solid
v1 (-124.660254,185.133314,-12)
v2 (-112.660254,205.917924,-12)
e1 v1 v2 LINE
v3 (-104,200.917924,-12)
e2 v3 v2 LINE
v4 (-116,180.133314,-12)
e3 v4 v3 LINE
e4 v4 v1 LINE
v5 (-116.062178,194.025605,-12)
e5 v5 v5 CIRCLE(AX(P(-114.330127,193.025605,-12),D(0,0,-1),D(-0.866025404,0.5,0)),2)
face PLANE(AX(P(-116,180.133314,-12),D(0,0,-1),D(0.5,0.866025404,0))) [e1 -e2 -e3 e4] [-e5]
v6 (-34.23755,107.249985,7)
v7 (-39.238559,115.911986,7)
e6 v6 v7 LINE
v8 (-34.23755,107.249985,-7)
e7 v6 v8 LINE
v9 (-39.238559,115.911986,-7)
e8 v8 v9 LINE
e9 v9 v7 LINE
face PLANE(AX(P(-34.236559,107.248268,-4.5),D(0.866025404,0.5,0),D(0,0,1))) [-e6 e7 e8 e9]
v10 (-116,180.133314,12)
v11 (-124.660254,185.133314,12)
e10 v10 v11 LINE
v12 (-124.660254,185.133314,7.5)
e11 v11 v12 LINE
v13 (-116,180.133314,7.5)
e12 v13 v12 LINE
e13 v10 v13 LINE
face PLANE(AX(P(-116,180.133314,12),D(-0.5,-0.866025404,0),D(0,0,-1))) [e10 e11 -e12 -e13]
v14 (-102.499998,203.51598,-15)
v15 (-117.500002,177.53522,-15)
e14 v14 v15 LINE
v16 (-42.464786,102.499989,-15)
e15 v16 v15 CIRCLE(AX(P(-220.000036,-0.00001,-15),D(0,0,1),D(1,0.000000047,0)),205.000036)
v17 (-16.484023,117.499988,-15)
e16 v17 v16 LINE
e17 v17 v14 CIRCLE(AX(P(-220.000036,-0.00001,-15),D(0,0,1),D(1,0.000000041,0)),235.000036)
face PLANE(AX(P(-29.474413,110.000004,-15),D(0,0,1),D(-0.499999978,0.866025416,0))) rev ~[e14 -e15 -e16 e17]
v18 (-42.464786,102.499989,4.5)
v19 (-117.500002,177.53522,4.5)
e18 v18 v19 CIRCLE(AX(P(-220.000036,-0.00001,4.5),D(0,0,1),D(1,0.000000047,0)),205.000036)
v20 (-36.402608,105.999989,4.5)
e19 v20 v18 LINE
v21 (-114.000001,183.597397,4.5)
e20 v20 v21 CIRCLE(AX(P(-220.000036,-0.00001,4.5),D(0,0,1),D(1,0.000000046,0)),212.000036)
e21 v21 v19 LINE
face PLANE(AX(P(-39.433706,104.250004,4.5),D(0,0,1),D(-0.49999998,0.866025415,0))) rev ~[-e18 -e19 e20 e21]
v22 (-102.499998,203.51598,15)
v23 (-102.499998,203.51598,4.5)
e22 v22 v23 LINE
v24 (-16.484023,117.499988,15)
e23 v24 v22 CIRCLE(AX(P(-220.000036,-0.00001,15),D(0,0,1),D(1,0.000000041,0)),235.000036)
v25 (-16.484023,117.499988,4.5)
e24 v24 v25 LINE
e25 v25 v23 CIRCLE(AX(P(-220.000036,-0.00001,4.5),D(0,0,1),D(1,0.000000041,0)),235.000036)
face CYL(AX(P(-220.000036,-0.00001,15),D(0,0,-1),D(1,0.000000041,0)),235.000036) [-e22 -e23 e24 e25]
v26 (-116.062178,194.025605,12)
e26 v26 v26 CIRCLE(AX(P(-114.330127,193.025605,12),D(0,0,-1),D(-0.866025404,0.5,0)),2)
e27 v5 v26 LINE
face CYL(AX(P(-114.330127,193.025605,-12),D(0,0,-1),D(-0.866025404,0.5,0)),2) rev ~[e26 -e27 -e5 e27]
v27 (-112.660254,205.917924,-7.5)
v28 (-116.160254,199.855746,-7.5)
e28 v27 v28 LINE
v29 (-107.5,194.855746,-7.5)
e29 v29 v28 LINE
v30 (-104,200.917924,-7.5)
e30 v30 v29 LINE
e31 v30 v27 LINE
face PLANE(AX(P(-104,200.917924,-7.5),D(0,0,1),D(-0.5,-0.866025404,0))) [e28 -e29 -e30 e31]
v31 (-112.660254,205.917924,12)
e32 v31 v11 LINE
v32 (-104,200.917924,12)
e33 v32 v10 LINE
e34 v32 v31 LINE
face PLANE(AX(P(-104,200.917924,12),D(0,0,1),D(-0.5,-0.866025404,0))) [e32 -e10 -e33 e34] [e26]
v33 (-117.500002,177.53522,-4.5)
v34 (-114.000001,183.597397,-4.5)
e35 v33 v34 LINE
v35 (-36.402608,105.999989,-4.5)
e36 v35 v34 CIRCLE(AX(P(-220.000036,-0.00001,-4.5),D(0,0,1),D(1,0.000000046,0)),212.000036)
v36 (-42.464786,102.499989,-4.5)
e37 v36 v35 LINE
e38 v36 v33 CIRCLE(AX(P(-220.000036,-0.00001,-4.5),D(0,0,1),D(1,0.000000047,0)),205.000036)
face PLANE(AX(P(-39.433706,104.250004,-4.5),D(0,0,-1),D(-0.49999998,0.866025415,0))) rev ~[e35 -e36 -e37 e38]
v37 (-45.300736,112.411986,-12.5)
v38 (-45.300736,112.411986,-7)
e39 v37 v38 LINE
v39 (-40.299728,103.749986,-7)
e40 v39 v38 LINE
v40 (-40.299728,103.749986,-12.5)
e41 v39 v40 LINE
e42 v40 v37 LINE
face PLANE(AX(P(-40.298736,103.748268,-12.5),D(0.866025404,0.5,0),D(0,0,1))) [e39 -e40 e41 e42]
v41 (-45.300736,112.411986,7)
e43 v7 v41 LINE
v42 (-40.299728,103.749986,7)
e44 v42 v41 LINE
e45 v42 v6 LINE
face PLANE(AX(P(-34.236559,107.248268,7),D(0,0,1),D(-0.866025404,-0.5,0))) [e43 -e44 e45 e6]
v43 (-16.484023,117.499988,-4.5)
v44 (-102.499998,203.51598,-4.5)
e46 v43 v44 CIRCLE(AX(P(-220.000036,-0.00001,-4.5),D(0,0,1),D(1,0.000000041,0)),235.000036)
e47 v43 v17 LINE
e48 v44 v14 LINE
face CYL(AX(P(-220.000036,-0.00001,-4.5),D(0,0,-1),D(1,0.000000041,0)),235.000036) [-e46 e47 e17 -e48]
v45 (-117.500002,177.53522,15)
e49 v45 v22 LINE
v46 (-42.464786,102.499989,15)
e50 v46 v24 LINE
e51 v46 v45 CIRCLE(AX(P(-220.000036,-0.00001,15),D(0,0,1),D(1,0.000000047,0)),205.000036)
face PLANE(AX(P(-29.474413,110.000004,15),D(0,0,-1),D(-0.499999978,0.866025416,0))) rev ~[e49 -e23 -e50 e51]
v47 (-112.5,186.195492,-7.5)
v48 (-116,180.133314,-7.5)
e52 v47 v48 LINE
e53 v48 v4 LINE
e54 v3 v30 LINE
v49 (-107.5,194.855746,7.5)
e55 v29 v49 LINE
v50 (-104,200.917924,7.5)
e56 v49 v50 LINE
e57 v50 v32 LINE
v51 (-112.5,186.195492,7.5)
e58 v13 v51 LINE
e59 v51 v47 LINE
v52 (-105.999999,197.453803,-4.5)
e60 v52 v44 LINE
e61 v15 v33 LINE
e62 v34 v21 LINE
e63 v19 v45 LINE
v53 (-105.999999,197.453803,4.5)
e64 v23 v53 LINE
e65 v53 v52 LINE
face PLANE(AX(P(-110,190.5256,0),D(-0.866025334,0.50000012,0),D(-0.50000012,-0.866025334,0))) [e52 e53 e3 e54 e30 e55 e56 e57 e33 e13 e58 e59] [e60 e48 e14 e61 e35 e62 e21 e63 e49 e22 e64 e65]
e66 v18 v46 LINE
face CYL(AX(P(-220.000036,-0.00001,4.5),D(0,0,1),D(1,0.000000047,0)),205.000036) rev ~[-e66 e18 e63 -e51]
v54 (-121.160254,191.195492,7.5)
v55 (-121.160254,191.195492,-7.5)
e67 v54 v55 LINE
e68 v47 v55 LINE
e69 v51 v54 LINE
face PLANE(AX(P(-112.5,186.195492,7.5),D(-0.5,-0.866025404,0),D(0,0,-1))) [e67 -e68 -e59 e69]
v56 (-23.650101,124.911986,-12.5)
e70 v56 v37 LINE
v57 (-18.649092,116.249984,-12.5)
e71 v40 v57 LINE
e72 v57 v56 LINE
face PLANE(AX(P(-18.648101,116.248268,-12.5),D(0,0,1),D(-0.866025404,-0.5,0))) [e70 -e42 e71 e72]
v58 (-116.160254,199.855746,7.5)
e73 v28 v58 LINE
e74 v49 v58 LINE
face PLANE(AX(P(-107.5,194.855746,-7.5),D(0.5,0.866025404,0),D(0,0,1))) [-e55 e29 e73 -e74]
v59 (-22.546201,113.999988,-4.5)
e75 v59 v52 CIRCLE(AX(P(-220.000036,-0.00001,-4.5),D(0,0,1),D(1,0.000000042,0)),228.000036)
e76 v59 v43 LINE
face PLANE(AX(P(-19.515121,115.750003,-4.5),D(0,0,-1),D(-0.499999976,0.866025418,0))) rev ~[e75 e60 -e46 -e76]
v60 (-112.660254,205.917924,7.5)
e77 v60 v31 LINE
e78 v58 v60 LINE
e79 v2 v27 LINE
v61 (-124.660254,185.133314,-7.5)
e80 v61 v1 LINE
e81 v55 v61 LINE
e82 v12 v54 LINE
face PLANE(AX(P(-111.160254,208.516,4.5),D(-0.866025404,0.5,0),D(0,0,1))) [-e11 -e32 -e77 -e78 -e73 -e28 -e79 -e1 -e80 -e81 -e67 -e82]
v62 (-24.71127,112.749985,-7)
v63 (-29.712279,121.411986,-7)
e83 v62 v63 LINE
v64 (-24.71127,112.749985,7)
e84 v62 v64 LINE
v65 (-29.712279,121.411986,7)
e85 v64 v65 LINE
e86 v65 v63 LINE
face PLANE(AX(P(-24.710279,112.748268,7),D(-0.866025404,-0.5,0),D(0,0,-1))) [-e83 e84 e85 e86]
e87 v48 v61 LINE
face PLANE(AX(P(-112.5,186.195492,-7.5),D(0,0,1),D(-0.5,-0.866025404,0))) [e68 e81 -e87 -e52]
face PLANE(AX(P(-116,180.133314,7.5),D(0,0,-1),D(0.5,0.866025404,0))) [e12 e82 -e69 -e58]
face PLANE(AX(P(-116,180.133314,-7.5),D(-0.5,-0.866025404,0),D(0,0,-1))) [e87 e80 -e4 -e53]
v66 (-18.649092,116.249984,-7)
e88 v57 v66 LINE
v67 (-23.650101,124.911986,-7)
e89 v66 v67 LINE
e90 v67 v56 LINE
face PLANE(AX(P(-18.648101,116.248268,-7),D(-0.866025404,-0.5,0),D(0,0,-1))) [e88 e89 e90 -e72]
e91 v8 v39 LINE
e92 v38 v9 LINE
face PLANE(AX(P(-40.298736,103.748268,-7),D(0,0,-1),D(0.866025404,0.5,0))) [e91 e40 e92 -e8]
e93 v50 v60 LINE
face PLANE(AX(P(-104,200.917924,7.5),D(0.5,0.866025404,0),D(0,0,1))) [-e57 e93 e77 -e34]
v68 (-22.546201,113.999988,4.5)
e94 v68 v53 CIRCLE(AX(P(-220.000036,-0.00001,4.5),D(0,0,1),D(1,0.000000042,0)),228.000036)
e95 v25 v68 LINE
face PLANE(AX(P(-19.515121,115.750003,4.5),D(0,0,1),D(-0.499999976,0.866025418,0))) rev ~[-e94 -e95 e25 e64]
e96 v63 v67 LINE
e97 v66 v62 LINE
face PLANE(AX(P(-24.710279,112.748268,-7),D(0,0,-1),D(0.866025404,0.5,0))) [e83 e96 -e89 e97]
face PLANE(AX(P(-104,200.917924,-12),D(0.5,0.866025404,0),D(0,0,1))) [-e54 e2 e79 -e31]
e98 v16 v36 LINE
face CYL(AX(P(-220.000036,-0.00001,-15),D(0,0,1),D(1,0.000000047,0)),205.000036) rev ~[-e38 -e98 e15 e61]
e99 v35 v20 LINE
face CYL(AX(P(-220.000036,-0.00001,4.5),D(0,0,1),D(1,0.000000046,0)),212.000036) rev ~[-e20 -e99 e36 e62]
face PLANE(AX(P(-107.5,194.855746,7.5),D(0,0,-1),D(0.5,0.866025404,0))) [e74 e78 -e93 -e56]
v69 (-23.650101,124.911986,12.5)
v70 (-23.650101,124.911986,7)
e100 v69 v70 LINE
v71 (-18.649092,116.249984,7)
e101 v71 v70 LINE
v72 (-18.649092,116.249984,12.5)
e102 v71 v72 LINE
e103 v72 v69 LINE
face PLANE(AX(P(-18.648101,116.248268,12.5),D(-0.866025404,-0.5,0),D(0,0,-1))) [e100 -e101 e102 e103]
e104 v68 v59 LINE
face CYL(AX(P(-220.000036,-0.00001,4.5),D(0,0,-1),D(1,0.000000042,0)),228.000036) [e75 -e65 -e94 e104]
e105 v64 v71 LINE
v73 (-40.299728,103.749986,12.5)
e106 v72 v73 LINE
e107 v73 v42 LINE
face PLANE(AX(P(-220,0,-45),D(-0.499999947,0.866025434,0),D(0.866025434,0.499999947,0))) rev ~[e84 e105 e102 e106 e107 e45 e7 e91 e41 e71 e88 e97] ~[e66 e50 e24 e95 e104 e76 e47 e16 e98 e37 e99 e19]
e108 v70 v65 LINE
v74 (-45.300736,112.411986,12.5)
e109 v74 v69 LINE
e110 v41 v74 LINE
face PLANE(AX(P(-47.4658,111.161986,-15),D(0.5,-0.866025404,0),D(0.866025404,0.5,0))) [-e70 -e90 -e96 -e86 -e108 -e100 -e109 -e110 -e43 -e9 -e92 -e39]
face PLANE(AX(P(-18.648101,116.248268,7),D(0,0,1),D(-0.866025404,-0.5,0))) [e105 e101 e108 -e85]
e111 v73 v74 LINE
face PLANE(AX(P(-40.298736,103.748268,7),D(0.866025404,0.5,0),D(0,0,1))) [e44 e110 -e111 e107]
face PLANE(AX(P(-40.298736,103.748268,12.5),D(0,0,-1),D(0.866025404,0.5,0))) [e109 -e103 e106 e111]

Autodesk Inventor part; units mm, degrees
sketch "Sketch2" plane through (0, 0, 0) normal (0, 1, 0) x (-1, 0, 0)
  line L0 (15, 15) -> (-15, 15)
  line L1 (-15, -15) -> (15, -15)
  line L2 (15, 4.5) -> (8, 4.5)
  line L3 (8, 4.5) -> (8, -4.5)
  line L4 (8, -4.5) -> (15, -4.5)
  line L5 (-15, 4.5) -> (-8, 4.5)
  line L6 (-8, 4.5) -> (-8, -4.5)
  line L7 (-8, -4.5) -> (-15, -4.5)
  line L8 (15, -15) -> (15, -4.5)
  line L9 (15, 4.5) -> (15, 15)
  line L10 (-15, 15) -> (-15, 4.5)
  line L11 (-15, -4.5) -> (-15, -15)
  point P0 (0, 0)
  dimension "d18" = 9
  dimension "d19" = 7
  dimension "d21" = 16
  dimension "d22" = 30
  dimension "d23" = 15
  dimension "d24" = 4.5
  dimension "d25" = 8
sketch "Sketch6" plane through (0, 0, 0) normal (0, 0, 1) x (1, 0, 0)
  arc A0 (0, 0) -> (-110, 190.5256) centre (-220, 0) ccw
  line L0 (-220, 0) -> (-110, 190.5256) construction
  line L1 (-220, 0) -> (0, 0) construction
  dimension "d41" = 220
  dimension "d42" = 60
  dimension "d43" = 220
  dimension "d44" = 0
sweep "Sweep2" add profiles "Sketch2" path "Sketch6"
sketch "Sketch7" plane through (-102.5, 203.516, 4.5) normal (-0.8660254, 0.5, 0) x (0, 0, 1)
  line L0 (-16.5, -3) -> (-12, -3)
  line L1 (-12, -3) -> (-12, -10)
  line L2 (-12, -10) -> (3, -10)
  line L3 (3, -10) -> (3, -3)
  line L4 (3, -3) -> (7.5, -3)
  line L5 (7.5, -3) -> (7.5, -27)
  line L6 (7.5, -27) -> (3, -27)
  line L7 (3, -27) -> (3, -20)
  line L8 (3, -20) -> (-12, -20)
  line L9 (-12, -20) -> (-12, -27)
  line L10 (-12, -27) -> (-16.5, -27)
  line L11 (-16.5, -27) -> (-16.5, -3)
  line L12 (-19.5, 0) -> (-19.5, -30) projected
  line L13 (-9, -7) -> (-9, 0) projected
  line L14 (0, 0) -> (0, -7) projected
  line L15 (10.5, -30) -> (10.5, 0) projected
  line L16 (-19.5, -30) -> (-9, -30) projected
  line L17 (-9, 0) -> (-19.5, 0) projected
  line L18 (0, -30) -> (10.5, -30) projected
  line L19 (-9, -23) -> (0, -23) projected
  line L20 (0, -7) -> (-9, -7) projected
  point P0 (-4.5, -125)
  point P1 (-14.25, 0)
  dimension "d47" = 3
  dimension "d48" = 3
  dimension "d49" = 3
  dimension "d50" = 3
  dimension "d51" = 3
  dimension "d52" = 3
  dimension "d53" = 3
  dimension "d54" = 3
  dimension "d55" = 3
extrude "Extrusion3" add sketch "Sketch7" along normal blind 10
sketch "Sketch8" plane through (-116, 180.1333, -12) normal (0, 0, -1) x (-0.8660254, 0.5, 0)
  circle A0 centre (5, 12) radius 2
  line L0 (0, 0) -> (10, 0) projected
  line L1 (10, 24) -> (10, 0) projected
  point P0 (-190.5256, -98)
  dimension "d58" = 4
  dimension "d59" = 12
  dimension "d60" = 5
extrude "Extrusion4" cut sketch "Sketch8" against normal through all
sketch "Sketch9" plane through (0, 0, 0) normal (0, 1, 0) x (-1, 0, 0)
  line L0 (-40, 40) -> (40, 40)
  line L1 (40, 40) -> (40, -40)
  line L2 (40, -40) -> (-40, -40)
  line L3 (-40, -40) -> (-40, 40)
  point P0 (0, 0)
  dimension "d63" = 80
  dimension "d64" = 80
  dimension "d65" = 40
  dimension "d66" = 40
ref_plane "Work Plane1" through (0, 50, 0) normal (0, 1, 0) x (-1, 0, 0)
sketch "Sketch10" plane through (0, 50, 0) normal (0, 1, 0) x (-1, 0, 0)
  line L0 (-9.6, 15) -> (21.4, 15)
  line L1 (21.4, 15) -> (21.4, -15)
  line L2 (21.4, -15) -> (-9.6, -15)
  line L3 (-9.6, -15) -> (-9.6, 15)
  point P0 (0, 0)
  dimension "d68" = 30
  dimension "d69" = 9.6
  dimension "d70" = 15
  dimension "d71" = 31
loft "Loft1" add profiles "Sketch9", "Sketch10"
ref_plane "Work Plane2" through (0, 0, -79) normal (0, 0, 1) x (1, 0, 0)
sketch "Sketch11" plane through (0, 0, -79) normal (0, 0, 1) x (1, 0, 0)
  line L0 (50, -5) -> (-129.034, -5)
  line L1 (-129.034, -5) -> (-129.034, 135)
  line L2 (-129.034, 135) -> (-90, 202.6089)
  line L3 (-90, 202.6089) -> (50, 95)
  line L4 (50, -5) -> (50, 95)
  point P0 (0, 0)
  dimension "d77" = 100
  dimension "d79" = 140
  dimension "d80" = 67.6089
  dimension "d81" = 140
  dimension "d82" = 150
  dimension "d83" = 50
  dimension "d86" = 5
extrude "Extrusion5" [suppressed]
sketch "Sketch12" plane through (-40, 0, 40) normal (0, -1, 0) x (1, 0, 0)
  line L0 (70, -70) -> (10, -70)
  line L1 (10, -70) -> (10, -10)
  line L2 (10, -10) -> (70, -10)
  line L3 (70, -10) -> (70, -70)
  line L4 (0, 0) -> (0, -80) projected
  line L5 (0, -80) -> (80, -80) projected
  line L6 (80, -80) -> (80, 0) projected
  line L7 (80, 0) -> (0, 0) projected
  point P0 (40, -40)
  dimension "d87" = 10
  dimension "d88" = 10
  dimension "d89" = 10
  dimension "d90" = 10
ref_plane "Work Plane3" through (-40, 45, 40) normal (0, -1, 0) x (1, 0, 0)
sketch "Sketch14" plane through (-40, 45, 40) normal (0, -1, 0) x (1, 0, 0)
  line L0 (40.5, -40.5) -> (39.5, -40.5)
  line L1 (39.5, -40.5) -> (39.5, -39.5)
  line L2 (39.5, -39.5) -> (40.5, -39.5)
  line L3 (40.5, -39.5) -> (40.5, -40.5)
  line L4 (80, 0) -> (0, 0) projected
  line L5 (0, 0) -> (0, -80) projected
  point P0 (40, -40)
  point P1 (0, -40)
  dimension "d95" = 1
  dimension "d96" = 1
  dimension "d97" = 39.5
  dimension "d98" = 39.5
loft "Loft2" cut profiles "Sketch12", "Sketch14" contours L0 L1 L2 L3 / all
ref_plane "Work Plane4" through (9.6, 50, -45) normal (0, 0, -1) x (-1, 0, 0)
sketch "Sketch15" plane through (9.6, 50, -45) normal (0, 0, -1) x (-1, 0, 0)
  line L0 (-71.3683, -50) -> (104.0101, -50)
  line L1 (229.6, -50) -> (-99.4897, 140)
  line L2 (-99.4897, 140) -> (-99.4897, -50)
  line L3 (-99.4897, -50) -> (-71.3683, -50)
  line L4 (229.6, -50) -> (104.0101, -50)
  point P0 (9.6, -50)
  dimension "d104" = 220
  dimension "d105" = 30
  dimension "d107" = 190
extrude "Extrusion6" cut sketch "Sketch15" against normal through all
sketch "Sketch16" plane through (-42.4648, 102.5, -15) normal (0.5, -0.8660254, 0) x (0.8660254, 0.5, 0)
  line L0 (27.5, 27.5) -> (27.5, 22)
  line L1 (27.5, 22) -> (20.5, 22)
  line L2 (20.5, 22) -> (20.5, 8)
  line L3 (23, 10.5) -> (-7.5462, 10.5) projected
  line L4 (20.5, 8) -> (27.5, 8)
  line L5 (27.5, 8) -> (27.5, 2.5)
  line L6 (27.5, 2.5) -> (2.5, 2.5)
  line L7 (2.5, 2.5) -> (2.5, 8)
  line L8 (2.5, 8) -> (9.5, 8)
  line L9 (9.5, 8) -> (9.5, 22)
  line L10 (9.5, 22) -> (2.5, 22)
  line L11 (2.5, 27.5) -> (27.5, 27.5)
  line L12 (2.5, 22) -> (2.5, 27.5)
  line L13 (0, 30) -> (30, 30) projected
  line L14 (0, 19.5) -> (0, 30) projected
  line L15 (7, 19.5) -> (0, 19.5) projected
  line L16 (7, 10.5) -> (7, 19.5) projected
  line L17 (30, 0) -> (0, 0) projected
  line L18 (30, 10.5) -> (30, 0) projected
  line L19 (23, 19.5) -> (23, 10.5) projected
  point P0 (-14.4744, 15)
  dimension "d110" = 2.5
  dimension "d111" = 2.5
  dimension "d112" = 2.5
  dimension "d113" = 2.5
  dimension "d114" = 2.5
  dimension "d115" = 2.5
  dimension "d116" = 2.5
  dimension "d117" = 2.5
extrude "Extrusion7" cut sketch "Sketch16" against normal blind 10
properties part number "LightRail_endSection"
